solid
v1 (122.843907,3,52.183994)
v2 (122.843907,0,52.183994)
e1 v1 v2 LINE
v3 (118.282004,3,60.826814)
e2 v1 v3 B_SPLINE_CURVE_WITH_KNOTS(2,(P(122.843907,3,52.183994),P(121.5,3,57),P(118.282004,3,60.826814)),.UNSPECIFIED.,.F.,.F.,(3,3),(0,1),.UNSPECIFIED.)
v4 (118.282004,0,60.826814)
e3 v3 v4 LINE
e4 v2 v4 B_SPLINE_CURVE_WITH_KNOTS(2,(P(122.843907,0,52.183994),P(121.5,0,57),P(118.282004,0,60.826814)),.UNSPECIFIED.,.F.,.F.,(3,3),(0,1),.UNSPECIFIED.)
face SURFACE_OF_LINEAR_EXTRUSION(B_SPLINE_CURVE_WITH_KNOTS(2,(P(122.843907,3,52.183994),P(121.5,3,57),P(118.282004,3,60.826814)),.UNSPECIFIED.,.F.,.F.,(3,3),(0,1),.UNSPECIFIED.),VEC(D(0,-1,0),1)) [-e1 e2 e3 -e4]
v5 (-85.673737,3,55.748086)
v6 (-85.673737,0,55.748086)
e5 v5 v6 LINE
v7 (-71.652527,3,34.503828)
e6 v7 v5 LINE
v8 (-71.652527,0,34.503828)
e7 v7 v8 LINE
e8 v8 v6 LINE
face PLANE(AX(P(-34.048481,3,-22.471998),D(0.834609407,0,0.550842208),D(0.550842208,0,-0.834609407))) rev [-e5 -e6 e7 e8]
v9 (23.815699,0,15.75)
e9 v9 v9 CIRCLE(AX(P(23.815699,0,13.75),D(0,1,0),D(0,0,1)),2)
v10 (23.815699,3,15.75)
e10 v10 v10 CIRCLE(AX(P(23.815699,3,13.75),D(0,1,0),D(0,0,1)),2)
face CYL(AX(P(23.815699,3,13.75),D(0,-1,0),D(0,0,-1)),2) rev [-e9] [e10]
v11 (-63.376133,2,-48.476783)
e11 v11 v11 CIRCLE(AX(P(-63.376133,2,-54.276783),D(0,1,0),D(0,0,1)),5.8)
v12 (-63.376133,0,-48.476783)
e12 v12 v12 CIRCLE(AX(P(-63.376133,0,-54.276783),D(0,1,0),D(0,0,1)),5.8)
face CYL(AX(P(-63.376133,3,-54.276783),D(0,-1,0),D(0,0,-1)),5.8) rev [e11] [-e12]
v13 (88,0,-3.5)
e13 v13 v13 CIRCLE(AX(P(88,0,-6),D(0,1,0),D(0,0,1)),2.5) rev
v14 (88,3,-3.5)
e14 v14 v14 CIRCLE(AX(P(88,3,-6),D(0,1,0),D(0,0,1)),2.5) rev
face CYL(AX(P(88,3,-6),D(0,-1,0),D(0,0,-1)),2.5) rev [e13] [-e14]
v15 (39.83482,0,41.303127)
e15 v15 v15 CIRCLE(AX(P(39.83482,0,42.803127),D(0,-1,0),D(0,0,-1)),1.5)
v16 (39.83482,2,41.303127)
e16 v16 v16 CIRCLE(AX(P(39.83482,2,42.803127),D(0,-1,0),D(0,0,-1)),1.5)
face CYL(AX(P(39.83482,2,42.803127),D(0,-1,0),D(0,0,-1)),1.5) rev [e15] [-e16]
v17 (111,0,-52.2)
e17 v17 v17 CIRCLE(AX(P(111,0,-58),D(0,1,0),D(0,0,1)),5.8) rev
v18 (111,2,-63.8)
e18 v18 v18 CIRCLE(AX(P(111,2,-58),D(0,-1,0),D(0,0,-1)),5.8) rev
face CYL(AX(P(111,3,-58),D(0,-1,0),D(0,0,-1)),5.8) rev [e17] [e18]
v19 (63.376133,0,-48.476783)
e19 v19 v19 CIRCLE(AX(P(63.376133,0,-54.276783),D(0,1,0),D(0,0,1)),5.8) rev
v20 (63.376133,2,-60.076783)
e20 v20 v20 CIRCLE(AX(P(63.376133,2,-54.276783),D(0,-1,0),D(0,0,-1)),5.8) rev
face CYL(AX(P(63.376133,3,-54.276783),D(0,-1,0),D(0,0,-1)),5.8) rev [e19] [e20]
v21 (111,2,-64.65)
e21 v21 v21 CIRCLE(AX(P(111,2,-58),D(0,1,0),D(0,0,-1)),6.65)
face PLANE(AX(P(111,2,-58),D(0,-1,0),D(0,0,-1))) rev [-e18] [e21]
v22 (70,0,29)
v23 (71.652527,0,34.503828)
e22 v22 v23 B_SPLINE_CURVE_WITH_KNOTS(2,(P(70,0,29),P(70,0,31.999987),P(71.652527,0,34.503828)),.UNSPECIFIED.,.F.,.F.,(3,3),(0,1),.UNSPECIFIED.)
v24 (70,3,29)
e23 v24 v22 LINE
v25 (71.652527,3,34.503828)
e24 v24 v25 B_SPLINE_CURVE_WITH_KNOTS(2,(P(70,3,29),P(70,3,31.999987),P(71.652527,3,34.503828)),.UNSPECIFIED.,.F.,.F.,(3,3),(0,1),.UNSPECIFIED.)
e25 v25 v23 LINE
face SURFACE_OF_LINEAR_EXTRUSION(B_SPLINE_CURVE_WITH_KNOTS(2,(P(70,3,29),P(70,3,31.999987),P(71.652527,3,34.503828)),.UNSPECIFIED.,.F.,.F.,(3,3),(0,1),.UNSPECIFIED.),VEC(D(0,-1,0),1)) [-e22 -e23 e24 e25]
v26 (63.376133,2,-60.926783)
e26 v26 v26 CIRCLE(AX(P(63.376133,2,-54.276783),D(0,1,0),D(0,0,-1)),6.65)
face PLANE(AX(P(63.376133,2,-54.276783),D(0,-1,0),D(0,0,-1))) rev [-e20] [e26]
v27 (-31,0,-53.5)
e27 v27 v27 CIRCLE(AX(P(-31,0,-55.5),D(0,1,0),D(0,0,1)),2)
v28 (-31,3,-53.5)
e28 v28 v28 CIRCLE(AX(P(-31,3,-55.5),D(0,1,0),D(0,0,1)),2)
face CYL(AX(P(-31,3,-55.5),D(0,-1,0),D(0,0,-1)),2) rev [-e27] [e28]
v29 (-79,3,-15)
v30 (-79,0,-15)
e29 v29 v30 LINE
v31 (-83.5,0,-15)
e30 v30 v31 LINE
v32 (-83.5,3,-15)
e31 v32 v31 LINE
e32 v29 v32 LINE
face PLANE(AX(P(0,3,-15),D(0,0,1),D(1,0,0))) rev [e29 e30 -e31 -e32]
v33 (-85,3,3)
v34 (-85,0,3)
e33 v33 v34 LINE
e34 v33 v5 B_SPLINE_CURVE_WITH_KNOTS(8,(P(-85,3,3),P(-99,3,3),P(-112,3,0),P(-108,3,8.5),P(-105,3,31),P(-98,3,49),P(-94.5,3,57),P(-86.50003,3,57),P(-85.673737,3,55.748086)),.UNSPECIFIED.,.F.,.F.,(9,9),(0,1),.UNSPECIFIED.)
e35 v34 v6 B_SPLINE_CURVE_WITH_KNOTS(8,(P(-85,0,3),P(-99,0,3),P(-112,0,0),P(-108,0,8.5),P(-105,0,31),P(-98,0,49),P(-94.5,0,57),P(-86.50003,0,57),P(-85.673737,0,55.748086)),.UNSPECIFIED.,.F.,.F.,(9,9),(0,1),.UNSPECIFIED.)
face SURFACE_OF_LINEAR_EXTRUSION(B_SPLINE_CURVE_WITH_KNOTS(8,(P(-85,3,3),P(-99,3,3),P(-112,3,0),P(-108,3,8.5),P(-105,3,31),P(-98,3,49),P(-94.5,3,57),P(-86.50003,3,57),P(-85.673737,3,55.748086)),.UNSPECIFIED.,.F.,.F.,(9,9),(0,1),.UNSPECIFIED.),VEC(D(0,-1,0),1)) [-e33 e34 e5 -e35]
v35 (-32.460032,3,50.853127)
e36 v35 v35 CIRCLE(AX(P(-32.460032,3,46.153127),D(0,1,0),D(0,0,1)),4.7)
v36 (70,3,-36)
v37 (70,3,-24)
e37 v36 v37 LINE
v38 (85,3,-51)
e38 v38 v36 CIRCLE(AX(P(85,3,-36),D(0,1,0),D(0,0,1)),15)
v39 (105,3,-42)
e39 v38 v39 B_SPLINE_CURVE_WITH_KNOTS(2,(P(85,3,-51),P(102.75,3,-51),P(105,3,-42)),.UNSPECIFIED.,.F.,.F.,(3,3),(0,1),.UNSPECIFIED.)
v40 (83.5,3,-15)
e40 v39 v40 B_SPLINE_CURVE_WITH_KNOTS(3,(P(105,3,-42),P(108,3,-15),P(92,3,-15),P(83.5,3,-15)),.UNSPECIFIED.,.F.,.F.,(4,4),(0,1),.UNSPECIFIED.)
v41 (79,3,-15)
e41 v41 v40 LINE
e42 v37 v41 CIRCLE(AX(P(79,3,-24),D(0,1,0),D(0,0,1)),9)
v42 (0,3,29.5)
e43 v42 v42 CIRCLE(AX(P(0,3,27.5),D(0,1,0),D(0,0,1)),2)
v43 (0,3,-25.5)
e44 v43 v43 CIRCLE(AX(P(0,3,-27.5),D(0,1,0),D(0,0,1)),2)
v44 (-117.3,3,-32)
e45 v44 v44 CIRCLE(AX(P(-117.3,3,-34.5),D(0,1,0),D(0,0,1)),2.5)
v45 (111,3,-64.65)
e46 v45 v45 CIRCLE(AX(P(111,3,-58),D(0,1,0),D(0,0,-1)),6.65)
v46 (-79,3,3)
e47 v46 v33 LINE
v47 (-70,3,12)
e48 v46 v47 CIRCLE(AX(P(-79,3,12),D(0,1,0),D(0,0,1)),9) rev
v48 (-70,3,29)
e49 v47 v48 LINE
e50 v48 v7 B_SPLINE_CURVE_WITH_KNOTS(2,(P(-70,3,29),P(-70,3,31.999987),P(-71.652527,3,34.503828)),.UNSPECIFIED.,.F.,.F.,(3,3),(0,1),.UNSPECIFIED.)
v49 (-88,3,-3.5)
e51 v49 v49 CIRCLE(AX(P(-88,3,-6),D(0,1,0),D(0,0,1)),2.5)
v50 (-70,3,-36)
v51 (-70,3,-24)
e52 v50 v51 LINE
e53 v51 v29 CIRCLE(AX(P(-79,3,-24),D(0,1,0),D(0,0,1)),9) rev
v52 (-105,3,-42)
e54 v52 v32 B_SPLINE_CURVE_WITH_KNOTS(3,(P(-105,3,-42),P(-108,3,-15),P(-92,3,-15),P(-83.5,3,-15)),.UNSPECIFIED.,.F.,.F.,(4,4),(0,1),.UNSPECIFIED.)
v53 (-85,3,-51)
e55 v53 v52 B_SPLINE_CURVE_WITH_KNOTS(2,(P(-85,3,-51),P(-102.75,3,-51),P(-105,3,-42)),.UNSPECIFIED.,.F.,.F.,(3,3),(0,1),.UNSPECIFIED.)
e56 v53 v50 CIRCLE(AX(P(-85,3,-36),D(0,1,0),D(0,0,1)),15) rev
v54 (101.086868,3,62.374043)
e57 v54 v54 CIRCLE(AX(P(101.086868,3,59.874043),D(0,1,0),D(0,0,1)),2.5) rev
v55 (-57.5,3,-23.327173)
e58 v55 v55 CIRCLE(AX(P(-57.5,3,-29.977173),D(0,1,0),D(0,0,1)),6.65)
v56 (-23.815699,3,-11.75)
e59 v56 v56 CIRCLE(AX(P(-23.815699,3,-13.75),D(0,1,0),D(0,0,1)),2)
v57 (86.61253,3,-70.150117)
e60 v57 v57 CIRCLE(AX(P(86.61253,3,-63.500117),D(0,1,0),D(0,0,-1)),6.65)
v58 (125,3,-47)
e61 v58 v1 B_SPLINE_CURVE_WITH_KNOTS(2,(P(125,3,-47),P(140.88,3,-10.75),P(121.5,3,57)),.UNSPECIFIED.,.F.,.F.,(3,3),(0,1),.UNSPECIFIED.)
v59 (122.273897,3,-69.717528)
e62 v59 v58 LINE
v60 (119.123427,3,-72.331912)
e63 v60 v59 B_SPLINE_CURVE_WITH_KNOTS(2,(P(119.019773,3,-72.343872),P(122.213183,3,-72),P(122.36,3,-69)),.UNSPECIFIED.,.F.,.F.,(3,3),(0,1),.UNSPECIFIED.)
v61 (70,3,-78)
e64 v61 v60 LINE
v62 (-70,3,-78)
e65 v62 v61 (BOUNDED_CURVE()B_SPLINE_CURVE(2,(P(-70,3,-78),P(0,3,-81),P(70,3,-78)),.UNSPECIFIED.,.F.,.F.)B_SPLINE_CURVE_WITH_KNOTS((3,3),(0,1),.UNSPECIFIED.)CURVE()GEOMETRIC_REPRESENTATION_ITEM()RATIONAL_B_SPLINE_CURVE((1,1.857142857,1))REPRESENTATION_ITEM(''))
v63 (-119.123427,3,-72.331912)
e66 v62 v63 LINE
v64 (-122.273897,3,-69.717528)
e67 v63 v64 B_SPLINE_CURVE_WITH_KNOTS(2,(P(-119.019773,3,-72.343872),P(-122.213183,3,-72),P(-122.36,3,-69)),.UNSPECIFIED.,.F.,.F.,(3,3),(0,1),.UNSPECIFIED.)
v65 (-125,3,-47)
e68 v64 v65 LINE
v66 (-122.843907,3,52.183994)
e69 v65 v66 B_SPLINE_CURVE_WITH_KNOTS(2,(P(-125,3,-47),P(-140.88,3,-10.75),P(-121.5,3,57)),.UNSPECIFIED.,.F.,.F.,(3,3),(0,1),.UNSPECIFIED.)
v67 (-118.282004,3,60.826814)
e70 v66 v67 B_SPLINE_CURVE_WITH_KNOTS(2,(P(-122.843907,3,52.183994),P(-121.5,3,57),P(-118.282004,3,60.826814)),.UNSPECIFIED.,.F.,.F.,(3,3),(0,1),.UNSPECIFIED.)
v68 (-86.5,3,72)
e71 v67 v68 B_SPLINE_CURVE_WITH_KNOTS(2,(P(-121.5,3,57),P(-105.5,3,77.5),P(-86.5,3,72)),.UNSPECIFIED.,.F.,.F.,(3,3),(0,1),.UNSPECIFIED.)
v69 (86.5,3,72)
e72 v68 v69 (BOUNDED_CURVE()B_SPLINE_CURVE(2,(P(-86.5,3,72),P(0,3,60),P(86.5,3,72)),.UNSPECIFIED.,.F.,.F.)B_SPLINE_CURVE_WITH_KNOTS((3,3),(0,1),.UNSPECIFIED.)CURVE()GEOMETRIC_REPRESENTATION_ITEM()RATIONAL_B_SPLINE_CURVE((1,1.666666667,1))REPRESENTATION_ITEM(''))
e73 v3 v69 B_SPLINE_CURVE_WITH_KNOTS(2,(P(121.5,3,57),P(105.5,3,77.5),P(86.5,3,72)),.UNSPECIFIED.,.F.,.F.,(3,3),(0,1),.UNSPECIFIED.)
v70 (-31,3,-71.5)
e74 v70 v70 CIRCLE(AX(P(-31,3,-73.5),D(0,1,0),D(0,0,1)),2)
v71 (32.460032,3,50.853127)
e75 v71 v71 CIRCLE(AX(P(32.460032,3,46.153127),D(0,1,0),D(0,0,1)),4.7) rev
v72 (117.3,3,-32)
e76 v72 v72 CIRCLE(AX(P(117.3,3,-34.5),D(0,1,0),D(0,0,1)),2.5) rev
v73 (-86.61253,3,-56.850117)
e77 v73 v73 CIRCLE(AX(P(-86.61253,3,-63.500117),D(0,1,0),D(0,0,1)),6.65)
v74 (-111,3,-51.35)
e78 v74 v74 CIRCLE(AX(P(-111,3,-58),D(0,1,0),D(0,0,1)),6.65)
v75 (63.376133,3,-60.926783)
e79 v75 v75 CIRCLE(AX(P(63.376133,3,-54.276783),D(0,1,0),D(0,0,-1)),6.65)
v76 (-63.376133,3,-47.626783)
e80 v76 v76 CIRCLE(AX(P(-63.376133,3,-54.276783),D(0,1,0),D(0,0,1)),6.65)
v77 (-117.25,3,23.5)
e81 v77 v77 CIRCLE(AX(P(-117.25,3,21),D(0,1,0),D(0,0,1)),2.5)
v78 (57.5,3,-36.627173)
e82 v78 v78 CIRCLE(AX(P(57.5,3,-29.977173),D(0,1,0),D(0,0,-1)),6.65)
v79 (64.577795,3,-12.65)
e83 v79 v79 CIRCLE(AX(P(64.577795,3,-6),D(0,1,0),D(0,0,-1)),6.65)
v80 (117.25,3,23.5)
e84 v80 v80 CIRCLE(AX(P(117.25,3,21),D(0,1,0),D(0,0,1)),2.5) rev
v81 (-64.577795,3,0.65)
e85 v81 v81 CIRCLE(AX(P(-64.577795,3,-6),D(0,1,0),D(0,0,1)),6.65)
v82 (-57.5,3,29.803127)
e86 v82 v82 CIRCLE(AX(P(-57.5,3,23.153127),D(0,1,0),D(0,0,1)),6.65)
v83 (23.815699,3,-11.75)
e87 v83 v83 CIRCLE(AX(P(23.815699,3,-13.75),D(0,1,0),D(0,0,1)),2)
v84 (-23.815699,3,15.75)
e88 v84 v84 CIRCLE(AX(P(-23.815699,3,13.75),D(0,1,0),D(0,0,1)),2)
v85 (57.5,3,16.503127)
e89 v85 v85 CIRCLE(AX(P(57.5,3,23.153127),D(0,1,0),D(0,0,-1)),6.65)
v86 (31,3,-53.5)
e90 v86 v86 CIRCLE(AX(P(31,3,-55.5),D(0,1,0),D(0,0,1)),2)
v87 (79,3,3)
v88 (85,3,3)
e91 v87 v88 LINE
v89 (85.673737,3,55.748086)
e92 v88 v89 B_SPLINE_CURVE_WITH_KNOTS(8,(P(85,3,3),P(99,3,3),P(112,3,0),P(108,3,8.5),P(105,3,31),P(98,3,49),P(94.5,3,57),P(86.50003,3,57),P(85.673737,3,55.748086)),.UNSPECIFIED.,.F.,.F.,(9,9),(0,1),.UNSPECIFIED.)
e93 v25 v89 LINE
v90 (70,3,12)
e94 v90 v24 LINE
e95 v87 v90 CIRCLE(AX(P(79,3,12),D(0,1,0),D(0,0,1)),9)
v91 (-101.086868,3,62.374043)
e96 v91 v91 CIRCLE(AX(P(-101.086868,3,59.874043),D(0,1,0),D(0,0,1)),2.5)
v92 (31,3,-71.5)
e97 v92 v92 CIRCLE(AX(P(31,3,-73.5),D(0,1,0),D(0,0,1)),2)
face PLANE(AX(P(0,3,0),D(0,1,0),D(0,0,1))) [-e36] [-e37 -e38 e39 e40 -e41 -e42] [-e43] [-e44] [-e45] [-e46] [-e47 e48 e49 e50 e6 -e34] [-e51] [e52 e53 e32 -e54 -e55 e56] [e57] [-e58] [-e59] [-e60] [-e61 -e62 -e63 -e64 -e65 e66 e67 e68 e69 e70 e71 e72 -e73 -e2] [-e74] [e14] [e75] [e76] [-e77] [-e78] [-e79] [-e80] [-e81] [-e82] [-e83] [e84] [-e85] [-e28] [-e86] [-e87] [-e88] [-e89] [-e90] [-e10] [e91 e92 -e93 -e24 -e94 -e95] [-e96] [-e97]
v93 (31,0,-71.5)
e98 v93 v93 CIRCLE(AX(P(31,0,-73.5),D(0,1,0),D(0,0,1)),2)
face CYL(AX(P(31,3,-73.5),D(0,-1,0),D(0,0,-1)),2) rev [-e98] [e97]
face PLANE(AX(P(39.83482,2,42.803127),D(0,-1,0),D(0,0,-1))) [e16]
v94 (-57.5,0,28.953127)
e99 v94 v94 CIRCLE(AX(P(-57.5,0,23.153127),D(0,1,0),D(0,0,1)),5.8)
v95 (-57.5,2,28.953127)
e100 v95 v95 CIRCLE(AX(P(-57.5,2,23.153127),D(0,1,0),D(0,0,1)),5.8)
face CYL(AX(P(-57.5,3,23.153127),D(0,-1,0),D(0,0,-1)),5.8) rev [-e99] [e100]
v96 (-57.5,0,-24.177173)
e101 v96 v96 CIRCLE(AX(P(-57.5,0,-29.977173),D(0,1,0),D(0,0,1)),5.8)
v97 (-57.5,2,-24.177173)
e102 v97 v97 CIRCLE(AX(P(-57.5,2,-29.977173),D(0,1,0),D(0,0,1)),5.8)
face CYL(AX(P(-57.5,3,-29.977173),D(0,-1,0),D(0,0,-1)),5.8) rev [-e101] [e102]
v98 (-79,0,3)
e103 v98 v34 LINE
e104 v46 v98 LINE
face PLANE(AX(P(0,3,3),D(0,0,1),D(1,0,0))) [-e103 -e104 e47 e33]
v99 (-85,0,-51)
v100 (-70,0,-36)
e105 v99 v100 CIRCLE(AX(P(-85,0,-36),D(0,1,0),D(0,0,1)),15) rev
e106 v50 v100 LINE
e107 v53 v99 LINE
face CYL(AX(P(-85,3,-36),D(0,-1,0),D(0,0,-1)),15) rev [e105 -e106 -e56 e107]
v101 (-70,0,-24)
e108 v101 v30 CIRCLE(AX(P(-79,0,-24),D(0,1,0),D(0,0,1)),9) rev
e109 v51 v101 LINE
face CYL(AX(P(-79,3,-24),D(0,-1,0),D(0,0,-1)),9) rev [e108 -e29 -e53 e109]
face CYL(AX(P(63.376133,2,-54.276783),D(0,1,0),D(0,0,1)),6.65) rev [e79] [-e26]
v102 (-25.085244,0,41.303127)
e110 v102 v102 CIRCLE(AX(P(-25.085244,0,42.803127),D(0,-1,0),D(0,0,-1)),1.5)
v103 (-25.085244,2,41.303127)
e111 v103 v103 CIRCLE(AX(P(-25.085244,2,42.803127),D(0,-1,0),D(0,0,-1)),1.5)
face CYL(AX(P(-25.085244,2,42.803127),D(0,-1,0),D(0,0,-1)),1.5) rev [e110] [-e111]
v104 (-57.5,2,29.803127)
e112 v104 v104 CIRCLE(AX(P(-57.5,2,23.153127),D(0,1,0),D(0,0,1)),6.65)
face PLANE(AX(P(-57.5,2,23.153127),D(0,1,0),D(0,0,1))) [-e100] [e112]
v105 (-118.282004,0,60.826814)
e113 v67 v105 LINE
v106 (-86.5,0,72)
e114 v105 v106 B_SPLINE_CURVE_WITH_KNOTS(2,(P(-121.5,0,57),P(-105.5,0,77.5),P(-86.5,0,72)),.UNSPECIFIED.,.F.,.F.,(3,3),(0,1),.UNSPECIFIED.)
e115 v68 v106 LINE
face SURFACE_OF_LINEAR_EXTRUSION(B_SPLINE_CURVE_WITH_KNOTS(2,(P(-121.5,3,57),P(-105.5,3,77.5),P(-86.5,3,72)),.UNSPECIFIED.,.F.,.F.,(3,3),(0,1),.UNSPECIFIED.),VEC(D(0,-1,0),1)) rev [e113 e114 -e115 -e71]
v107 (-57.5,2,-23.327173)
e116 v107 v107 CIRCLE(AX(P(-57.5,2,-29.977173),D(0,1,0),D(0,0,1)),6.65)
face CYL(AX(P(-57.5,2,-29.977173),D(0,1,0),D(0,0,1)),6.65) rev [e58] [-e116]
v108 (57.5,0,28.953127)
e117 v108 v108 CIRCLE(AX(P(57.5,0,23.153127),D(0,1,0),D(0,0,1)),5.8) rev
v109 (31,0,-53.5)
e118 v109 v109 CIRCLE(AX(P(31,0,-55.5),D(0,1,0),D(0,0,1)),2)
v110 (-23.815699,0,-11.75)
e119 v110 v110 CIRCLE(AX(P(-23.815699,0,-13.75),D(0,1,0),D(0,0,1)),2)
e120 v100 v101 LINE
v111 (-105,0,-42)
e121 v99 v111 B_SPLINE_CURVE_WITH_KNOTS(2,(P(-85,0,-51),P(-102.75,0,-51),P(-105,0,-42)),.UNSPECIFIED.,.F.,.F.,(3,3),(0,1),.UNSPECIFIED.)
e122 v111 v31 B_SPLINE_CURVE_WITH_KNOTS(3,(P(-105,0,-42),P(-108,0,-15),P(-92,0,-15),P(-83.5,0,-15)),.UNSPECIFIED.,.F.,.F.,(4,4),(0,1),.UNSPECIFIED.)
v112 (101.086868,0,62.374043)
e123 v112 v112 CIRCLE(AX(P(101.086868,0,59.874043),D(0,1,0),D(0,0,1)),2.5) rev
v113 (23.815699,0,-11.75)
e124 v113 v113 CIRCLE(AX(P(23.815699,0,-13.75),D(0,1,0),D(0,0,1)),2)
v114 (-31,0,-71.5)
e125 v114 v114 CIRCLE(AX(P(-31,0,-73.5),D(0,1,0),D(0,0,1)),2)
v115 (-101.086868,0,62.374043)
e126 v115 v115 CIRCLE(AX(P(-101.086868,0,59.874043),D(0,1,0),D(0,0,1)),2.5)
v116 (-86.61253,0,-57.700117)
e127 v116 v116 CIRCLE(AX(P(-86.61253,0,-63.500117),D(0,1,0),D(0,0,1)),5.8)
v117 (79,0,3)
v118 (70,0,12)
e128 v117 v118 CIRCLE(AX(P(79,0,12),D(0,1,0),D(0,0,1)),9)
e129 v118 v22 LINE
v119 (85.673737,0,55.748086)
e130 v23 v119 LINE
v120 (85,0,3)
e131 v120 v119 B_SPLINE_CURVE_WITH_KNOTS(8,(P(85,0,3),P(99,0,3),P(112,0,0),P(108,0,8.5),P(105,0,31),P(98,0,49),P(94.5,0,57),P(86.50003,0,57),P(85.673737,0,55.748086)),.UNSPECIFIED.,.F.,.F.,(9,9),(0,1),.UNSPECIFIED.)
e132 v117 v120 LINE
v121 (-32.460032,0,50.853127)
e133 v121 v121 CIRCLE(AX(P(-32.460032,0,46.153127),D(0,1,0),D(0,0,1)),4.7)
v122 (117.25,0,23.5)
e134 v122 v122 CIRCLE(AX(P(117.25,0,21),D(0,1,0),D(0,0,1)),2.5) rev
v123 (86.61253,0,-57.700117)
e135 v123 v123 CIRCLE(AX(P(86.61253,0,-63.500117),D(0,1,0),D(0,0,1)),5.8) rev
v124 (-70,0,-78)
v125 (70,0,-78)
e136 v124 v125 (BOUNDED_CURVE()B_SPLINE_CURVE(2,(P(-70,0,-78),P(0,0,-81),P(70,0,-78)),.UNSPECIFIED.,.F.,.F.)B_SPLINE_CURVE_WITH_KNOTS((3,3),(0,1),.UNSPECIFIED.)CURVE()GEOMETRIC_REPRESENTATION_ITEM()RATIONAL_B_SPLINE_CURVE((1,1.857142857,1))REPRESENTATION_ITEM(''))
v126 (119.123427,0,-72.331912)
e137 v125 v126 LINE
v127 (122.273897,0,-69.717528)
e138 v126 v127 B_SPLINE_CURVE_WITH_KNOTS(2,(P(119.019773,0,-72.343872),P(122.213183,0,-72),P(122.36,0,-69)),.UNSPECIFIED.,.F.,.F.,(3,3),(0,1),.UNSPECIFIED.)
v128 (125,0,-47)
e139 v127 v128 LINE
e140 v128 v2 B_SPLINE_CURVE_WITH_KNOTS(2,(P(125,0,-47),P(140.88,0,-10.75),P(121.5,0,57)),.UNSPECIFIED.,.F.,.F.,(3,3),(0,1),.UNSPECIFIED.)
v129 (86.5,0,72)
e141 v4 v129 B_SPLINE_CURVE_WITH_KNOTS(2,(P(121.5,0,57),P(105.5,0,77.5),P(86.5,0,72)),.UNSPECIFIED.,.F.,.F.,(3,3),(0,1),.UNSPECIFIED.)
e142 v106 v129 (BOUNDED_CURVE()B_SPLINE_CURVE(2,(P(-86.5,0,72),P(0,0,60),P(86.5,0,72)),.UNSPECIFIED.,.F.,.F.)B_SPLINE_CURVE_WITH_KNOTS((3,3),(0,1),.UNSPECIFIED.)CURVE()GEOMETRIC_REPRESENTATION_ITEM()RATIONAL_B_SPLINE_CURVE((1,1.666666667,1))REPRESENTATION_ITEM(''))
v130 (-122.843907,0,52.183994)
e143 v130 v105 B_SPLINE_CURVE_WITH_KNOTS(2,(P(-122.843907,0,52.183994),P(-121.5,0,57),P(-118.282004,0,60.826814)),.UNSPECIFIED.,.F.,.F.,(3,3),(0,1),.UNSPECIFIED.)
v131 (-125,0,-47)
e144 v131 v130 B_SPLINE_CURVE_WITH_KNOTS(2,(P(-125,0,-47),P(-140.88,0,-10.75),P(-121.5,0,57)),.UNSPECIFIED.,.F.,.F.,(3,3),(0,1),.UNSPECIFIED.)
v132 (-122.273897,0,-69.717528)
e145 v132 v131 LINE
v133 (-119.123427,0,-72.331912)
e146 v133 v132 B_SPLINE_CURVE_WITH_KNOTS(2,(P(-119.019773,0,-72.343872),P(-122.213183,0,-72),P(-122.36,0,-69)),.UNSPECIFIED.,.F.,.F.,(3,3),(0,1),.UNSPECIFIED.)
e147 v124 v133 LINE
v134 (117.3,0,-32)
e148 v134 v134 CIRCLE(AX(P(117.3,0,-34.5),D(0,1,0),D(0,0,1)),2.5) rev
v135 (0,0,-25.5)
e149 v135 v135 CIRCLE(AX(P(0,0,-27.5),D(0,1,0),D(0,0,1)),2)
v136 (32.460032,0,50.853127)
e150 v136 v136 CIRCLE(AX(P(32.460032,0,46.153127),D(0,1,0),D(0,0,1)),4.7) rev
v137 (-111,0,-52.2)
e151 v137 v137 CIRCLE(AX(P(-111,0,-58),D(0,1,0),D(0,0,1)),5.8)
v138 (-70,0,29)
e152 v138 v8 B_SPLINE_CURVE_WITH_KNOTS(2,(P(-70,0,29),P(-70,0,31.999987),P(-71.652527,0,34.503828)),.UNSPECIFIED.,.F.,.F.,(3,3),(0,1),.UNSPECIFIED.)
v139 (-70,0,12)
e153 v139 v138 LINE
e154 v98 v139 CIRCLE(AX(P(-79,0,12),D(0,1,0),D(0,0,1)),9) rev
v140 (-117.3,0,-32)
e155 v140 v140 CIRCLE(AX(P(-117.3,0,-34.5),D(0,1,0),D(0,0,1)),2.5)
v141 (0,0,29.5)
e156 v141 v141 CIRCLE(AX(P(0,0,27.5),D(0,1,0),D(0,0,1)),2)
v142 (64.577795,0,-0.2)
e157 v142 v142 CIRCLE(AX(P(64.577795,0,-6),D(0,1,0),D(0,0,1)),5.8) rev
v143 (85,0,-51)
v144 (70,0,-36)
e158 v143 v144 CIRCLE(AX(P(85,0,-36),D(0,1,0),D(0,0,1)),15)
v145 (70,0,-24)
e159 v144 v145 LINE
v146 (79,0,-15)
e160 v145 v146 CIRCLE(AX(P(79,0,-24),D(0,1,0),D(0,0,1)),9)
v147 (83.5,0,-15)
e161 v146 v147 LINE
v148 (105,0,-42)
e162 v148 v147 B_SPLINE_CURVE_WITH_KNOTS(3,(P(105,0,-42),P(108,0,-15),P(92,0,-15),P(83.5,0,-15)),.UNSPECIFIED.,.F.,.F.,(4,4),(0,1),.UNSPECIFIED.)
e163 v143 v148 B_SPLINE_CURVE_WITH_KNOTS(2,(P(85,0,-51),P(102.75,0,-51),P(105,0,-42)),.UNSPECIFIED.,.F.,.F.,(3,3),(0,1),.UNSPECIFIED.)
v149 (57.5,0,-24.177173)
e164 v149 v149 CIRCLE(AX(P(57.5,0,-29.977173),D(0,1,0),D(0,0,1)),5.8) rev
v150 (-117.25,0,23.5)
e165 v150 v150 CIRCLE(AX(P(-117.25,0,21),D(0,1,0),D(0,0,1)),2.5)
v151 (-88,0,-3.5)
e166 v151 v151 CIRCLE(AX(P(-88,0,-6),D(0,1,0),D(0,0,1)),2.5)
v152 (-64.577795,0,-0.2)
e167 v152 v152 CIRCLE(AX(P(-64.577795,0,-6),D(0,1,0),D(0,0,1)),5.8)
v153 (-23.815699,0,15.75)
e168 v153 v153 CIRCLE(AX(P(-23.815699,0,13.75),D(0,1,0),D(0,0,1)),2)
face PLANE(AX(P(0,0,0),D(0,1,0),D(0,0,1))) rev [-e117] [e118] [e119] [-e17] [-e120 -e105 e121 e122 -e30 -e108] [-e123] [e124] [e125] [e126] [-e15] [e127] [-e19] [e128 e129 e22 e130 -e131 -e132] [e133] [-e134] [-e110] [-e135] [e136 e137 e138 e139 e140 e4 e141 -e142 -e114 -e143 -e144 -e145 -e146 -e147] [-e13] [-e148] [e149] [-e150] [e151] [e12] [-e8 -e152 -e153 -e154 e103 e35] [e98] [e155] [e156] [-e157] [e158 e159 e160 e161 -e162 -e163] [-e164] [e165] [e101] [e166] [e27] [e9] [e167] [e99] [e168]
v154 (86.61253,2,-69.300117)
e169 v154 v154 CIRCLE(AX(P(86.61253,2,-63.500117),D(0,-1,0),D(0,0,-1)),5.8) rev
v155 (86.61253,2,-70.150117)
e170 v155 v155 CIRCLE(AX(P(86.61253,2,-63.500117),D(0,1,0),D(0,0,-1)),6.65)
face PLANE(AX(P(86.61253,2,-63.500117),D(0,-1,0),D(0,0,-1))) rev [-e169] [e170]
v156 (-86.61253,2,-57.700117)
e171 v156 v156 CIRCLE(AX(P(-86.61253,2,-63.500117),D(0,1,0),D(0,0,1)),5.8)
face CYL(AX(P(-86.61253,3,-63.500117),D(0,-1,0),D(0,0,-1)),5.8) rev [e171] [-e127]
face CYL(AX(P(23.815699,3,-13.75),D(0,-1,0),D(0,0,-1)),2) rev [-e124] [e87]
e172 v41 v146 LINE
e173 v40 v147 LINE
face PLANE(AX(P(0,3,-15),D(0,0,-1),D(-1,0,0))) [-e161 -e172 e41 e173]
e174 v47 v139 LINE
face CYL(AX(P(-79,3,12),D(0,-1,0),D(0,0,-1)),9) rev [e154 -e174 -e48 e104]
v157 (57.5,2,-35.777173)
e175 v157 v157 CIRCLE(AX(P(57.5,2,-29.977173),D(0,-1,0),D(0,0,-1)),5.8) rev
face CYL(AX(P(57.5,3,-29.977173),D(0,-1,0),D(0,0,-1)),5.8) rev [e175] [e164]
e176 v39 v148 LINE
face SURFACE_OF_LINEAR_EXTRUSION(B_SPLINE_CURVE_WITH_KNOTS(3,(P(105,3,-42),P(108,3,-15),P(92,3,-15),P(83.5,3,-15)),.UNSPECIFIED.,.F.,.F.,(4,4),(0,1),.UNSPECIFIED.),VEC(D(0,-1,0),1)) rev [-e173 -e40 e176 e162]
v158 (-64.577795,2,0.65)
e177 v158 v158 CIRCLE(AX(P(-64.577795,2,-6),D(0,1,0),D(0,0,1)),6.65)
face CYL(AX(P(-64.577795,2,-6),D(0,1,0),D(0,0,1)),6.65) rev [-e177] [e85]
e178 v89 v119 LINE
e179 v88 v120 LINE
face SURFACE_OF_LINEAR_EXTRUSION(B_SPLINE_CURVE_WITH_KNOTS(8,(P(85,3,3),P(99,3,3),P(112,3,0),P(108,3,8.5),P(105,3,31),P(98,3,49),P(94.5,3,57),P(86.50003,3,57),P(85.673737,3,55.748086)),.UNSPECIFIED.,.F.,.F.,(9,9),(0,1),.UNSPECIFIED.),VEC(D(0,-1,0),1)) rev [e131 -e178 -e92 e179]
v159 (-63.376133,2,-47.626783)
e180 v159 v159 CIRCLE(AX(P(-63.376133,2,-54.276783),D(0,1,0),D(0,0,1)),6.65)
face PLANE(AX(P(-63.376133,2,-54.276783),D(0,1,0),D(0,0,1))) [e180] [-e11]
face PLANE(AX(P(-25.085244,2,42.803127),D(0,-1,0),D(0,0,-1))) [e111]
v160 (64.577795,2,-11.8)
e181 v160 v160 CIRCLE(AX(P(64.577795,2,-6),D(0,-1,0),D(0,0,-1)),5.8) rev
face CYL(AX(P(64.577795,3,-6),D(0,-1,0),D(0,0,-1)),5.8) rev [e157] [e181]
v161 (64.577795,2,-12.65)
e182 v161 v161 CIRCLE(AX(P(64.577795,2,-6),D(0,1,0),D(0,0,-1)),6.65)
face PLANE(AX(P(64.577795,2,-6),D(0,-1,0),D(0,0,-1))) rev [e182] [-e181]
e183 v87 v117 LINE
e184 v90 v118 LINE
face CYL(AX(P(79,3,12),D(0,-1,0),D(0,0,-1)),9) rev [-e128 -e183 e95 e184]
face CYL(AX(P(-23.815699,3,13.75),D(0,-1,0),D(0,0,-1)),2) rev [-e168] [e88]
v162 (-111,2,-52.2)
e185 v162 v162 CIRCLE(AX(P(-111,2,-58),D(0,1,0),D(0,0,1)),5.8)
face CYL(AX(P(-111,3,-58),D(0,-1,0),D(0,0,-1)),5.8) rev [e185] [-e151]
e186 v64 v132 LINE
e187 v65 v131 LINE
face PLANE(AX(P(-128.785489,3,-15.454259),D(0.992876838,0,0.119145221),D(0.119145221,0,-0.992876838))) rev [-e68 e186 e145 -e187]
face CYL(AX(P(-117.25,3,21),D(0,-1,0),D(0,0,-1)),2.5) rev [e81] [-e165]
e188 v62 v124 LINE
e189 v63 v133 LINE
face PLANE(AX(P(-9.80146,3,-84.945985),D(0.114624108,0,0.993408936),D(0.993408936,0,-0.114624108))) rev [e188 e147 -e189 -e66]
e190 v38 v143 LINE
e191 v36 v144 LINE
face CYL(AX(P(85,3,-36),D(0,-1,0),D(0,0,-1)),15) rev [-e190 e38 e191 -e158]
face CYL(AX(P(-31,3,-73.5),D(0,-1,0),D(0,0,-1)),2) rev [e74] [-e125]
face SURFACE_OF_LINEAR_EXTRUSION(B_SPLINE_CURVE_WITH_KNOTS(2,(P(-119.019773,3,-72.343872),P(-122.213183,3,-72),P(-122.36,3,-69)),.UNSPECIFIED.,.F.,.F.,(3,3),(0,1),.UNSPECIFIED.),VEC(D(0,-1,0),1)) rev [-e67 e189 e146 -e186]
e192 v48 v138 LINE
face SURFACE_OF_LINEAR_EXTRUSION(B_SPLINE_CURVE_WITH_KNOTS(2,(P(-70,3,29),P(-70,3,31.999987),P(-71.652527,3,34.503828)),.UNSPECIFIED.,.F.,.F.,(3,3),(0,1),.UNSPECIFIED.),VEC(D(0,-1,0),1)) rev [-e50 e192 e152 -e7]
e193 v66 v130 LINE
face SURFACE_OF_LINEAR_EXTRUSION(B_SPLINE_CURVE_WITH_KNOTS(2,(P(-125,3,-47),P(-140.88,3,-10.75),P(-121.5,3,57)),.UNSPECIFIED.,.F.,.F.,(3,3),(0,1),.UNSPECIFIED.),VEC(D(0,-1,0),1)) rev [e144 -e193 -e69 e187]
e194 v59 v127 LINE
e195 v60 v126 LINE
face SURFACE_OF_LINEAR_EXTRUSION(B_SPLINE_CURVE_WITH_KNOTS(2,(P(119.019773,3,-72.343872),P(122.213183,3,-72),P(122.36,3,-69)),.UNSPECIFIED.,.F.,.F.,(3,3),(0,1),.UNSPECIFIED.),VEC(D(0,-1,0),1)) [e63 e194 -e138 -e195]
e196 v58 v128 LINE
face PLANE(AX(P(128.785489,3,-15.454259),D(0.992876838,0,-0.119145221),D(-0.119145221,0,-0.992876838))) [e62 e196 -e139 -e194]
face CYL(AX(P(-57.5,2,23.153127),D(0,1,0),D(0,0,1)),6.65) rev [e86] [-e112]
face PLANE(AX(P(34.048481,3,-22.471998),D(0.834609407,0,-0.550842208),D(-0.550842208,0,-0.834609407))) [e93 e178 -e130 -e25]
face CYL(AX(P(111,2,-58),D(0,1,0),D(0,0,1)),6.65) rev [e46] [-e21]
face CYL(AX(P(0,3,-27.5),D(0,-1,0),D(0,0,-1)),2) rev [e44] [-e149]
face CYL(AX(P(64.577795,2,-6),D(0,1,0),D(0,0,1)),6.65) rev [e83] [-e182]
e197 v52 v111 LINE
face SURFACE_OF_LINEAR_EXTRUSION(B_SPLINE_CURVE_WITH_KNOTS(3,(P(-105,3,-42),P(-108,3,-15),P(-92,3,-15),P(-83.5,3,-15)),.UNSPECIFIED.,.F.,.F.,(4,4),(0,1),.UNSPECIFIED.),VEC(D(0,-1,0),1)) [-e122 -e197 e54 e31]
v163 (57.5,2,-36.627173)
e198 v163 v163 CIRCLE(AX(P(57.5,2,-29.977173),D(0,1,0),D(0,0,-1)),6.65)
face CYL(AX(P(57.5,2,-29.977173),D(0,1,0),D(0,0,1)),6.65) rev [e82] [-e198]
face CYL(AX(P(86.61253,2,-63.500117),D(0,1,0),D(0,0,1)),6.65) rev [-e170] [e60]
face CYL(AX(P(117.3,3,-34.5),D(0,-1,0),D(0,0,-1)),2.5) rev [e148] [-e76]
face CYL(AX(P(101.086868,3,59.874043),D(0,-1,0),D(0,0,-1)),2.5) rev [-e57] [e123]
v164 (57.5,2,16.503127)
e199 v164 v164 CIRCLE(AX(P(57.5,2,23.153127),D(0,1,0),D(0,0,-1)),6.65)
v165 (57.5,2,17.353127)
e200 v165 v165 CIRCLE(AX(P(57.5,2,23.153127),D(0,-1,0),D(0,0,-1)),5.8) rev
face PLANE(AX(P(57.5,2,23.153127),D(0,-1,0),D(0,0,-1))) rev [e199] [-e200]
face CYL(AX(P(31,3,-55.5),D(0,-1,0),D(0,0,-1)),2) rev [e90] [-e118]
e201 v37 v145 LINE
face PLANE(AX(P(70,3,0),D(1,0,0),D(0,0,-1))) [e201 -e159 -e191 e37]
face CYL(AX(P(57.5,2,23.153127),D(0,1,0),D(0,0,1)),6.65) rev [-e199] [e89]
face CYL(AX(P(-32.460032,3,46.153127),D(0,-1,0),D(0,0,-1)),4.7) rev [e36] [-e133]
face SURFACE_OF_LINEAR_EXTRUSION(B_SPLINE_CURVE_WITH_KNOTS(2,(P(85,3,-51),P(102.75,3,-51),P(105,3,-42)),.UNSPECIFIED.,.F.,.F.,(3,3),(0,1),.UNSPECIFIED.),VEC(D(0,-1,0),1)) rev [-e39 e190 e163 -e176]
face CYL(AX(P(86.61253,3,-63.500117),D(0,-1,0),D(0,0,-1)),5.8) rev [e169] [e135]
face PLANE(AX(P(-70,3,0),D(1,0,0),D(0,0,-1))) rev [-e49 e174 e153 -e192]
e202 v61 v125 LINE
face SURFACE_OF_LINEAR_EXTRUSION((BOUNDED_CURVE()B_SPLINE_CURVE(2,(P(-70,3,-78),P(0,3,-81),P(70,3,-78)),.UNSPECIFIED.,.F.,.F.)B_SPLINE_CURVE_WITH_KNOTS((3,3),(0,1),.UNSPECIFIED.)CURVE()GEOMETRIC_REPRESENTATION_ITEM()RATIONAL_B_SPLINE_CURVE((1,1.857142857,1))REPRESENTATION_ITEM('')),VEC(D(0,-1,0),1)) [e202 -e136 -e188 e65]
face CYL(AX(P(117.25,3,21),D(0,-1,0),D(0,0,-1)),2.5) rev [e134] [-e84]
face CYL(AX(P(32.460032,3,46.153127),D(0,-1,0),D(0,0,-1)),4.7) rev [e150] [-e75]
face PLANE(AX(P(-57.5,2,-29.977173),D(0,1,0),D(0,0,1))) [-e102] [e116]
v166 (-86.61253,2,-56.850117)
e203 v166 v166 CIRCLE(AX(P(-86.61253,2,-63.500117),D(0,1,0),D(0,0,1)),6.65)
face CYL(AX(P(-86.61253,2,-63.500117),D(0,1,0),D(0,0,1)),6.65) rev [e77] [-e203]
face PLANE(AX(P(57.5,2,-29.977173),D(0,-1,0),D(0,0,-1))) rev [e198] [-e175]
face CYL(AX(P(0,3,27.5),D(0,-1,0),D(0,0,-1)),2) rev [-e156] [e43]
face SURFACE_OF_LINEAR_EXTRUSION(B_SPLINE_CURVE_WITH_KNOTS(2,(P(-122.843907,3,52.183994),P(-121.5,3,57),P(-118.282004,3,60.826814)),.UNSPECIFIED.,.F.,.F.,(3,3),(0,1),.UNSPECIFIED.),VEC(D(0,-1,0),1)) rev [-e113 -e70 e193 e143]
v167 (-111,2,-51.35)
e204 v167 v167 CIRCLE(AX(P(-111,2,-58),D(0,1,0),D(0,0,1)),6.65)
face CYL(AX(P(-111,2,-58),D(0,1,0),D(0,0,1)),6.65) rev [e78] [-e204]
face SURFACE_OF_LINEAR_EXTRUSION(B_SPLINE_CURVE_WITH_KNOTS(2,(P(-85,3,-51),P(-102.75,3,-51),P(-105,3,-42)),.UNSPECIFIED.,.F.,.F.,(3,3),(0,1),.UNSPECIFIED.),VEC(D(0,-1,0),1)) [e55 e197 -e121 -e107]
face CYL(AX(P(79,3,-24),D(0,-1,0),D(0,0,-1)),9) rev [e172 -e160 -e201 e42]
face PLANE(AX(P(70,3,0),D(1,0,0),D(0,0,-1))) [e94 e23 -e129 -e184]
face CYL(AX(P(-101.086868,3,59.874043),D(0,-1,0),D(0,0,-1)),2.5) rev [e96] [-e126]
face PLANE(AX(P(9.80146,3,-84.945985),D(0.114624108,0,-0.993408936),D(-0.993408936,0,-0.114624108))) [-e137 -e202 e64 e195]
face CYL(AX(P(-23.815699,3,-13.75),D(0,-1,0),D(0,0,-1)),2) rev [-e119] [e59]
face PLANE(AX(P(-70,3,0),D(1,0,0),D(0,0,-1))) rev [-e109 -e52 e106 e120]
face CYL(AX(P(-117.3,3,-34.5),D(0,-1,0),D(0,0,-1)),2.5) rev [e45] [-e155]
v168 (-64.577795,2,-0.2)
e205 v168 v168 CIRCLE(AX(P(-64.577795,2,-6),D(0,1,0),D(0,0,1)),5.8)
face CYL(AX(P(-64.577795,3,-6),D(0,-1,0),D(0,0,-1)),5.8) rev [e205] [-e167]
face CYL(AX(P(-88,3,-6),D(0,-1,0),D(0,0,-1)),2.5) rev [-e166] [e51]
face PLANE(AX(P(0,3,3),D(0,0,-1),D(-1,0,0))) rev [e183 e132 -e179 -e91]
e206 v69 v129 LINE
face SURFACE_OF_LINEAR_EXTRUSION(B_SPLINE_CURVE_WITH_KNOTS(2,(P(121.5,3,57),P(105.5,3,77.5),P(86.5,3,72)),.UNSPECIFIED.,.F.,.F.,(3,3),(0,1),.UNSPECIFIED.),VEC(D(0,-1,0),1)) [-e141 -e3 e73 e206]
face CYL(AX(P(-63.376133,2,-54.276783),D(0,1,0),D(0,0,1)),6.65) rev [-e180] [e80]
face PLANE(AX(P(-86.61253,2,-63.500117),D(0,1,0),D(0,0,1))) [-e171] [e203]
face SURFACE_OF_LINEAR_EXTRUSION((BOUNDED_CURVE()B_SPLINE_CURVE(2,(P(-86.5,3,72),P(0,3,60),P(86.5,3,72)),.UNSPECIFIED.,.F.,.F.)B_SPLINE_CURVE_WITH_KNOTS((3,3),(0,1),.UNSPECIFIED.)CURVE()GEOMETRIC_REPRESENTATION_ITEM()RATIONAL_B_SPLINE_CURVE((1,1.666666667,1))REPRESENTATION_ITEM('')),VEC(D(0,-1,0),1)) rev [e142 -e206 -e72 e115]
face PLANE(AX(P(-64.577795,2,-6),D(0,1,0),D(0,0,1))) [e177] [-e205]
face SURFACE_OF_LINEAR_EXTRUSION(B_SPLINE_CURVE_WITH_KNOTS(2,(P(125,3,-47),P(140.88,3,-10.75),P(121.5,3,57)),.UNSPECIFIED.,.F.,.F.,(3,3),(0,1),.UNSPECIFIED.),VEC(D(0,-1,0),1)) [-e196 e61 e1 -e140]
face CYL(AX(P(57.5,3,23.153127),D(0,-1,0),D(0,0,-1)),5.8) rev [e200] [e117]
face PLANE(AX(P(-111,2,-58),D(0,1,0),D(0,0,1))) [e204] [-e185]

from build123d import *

# Parameters (mm, degrees)
BOSS_EXTRUDE1_OUTLINE_R   = 2.5
BOSS_EXTRUDE1_OUTLINE_R_2 = 4.7
BOSS_EXTRUDE1_OUTLINE_R_3 = 5.8
BOSS_EXTRUDE1_OUTLINE_R_4 = 2
BOSS_EXTRUDE1_DEPTH       = 3
SKETCH3_R                 = 1.5
CUT_EXTRUDE1_DEPTH        = 2
SKETCH4_R                 = 6.65
CUT_EXTRUDE3_DEPTH        = 1


# Read off the part's stored shape, not the designer's step: Boss-Extrude1
with BuildPart() as part:
    # Boss-Extrude1 outline → Boss-Extrude1 (new body)
    with BuildSketch(Plane(origin=(0, 0, 0), x_dir=(1, 0, 0), z_dir=(0, 1, 0))):
        with BuildLine():
            Line((-70, 78), (-119.123426788, 72.331912294))
            add(Edge.make_bspline(
                [(-119.123426788, 72.331912294), (-121.817313074, 72.000000019), (-122.273896674, 69.717527721)],
                knots=[0.016356922, 0.016356922, 0.016356922, 0.873306336, 0.873306336, 0.873306336], degree=2))
            Line((-122.273896674, 69.717527721), (-125, 47))
            add(Edge.make_bspline(
                [(-125, 47), (-140.310843166, 12.049240253), (-122.843906966, -52.183993971)],
                knots=[0, 0, 0, 0.96415889, 0.96415889, 0.96415889], degree=2))
            add(Edge.make_bspline(
                [(-122.843906966, -52.183993971), (-121.5, -57), (-118.282004102, -60.826813609)],
                knots=[0, 0, 0, 1, 1, 1], degree=2))
            add(Edge.make_bspline(
                [(-118.282004102, -60.826813609), (-103.606996493, -76.952025301), (-86.5, -72)],
                knots=[0.099631764, 0.099631764, 0.099631764, 1, 1, 1], degree=2))
            add(Edge.make_bspline(
                [(-86.5, -72), (0, -60), (86.5, -72)],
                knots=[0, 0, 0, 1, 1, 1], degree=2, weights=[1, 1.666666667, 1]))
            add(Edge.make_bspline(
                [(118.282004106, -60.826813605), (103.606996495, -76.952025301), (86.5, -72)],
                knots=[0.099631763, 0.099631763, 0.099631763, 1, 1, 1], degree=2))
            add(Edge.make_bspline(
                [(122.843906966, -52.183993971), (121.5, -57), (118.282004106, -60.826813605)],
                knots=[0, 0, 0, 1, 1, 1], degree=2))
            add(Edge.make_bspline(
                [(125, 47), (140.310843171, 12.049240242), (122.843906966, -52.183993971)],
                knots=[0, 0, 0, 0.96415889, 0.96415889, 0.96415889], degree=2))
            Line((125, 47), (122.273896674, 69.717527721))
            add(Edge.make_bspline(
                [(119.123426788, 72.331912294), (121.817313074, 72.000000019), (122.273896674, 69.717527721)],
                knots=[0.016356922, 0.016356922, 0.016356922, 0.873306336, 0.873306336, 0.873306336], degree=2))
            Line((119.123426788, 72.331912294), (70, 78))
            add(Edge.make_bspline(
                [(-70, 78), (0, 81), (70, 78)],
                knots=[0, 0, 0, 1, 1, 1], degree=2, weights=[1, 1.857142857, 1]))
        make_face()
        with Locations((-101.086868344, -59.874042945)):
            Circle(BOSS_EXTRUDE1_OUTLINE_R, mode=Mode.SUBTRACT)
        with Locations((-32.460031949, -46.153127094)):
            Circle(BOSS_EXTRUDE1_OUTLINE_R_2, mode=Mode.SUBTRACT)
        with Locations((-117.25, -21)):
            Circle(BOSS_EXTRUDE1_OUTLINE_R, mode=Mode.SUBTRACT)
        with BuildLine():
            Line((-70, -12), (-70, -29))
            add(Edge.make_bspline(
                [(-70, -29), (-70, -31.999987298), (-71.652526625, -34.50382822)],
                knots=[0, 0, 0, 1, 1, 1], degree=2))
            Line((-71.652526625, -34.50382822), (-85.673736688, -55.74808589))
            add(Edge.make_bspline(
                [(-85, -3), (-99, -3), (-112, 0), (-108, -8.5), (-105, -31), (-98, -49), (-94.5, -57), (-86.500030089, -57), (-85.673736688, -55.74808589)],
                knots=[0, 0, 0, 0, 0, 0, 0, 0, 0, 1, 1, 1, 1, 1, 1, 1, 1, 1], degree=8))
            Line((-85, -3), (-79, -3))
            ThreePointArc((-79, -3), (-72.636038969, -5.636038969), (-70, -12))
        make_face(mode=Mode.SUBTRACT)
        with Locations((-57.5, -23.153127094)):
            Circle(BOSS_EXTRUDE1_OUTLINE_R_3, mode=Mode.SUBTRACT)
        with Locations((0, -27.5)):
            Circle(BOSS_EXTRUDE1_OUTLINE_R_4, mode=Mode.SUBTRACT)
        with Locations((-23.815698604, -13.75)):
            Circle(BOSS_EXTRUDE1_OUTLINE_R_4, mode=Mode.SUBTRACT)
        with Locations((32.460031949, -46.153127094)):
            Circle(BOSS_EXTRUDE1_OUTLINE_R_2, mode=Mode.SUBTRACT)
        with Locations((101.086868344, -59.874042945)):
            Circle(BOSS_EXTRUDE1_OUTLINE_R, mode=Mode.SUBTRACT)
        with Locations((57.5, -23.153127094)):
            Circle(BOSS_EXTRUDE1_OUTLINE_R_3, mode=Mode.SUBTRACT)
        with Locations((23.815698604, -13.75)):
            Circle(BOSS_EXTRUDE1_OUTLINE_R_4, mode=Mode.SUBTRACT)
        with BuildLine():
            add(Edge.make_bspline(
                [(85, -3), (99, -3), (112, 0), (108, -8.5), (105, -31), (98, -49), (94.5, -57), (86.500030089, -57), (85.673736688, -55.74808589)],
                knots=[0, 0, 0, 0, 0, 0, 0, 0, 0, 1, 1, 1, 1, 1, 1, 1, 1, 1], degree=8))
            Line((85.673736688, -55.74808589), (71.652526625, -34.50382822))
            add(Edge.make_bspline(
                [(70, -29), (70, -31.999987298), (71.652526625, -34.50382822)],
                knots=[0, 0, 0, 1, 1, 1], degree=2))
            Line((70, -29), (70, -12))
            ThreePointArc((70, -12), (72.636038969, -5.636038969), (79, -3))
            Line((79, -3), (85, -3))
        make_face(mode=Mode.SUBTRACT)
        with Locations((117.25, -21)):
            Circle(BOSS_EXTRUDE1_OUTLINE_R, mode=Mode.SUBTRACT)
        with Locations((-88, 6)):
            Circle(BOSS_EXTRUDE1_OUTLINE_R, mode=Mode.SUBTRACT)
        with Locations((-117.3, 34.5)):
            Circle(BOSS_EXTRUDE1_OUTLINE_R, mode=Mode.SUBTRACT)
        with BuildLine():
            add(Edge.make_bspline(
                [(-105, 42), (-108, 15), (-92, 15), (-83.5, 15)],
                knots=[0, 0, 0, 0, 1, 1, 1, 1], degree=3))
            add(Edge.make_bspline(
                [(-85, 51), (-102.75, 51), (-105, 42)],
                knots=[0, 0, 0, 1, 1, 1], degree=2))
            ThreePointArc((-85, 51), (-74.393398282, 46.606601718), (-70, 36))
            Line((-70, 36), (-70, 24))
            ThreePointArc((-70, 24), (-72.636038969, 17.636038969), (-79, 15))
            Line((-79, 15), (-83.5, 15))
        make_face(mode=Mode.SUBTRACT)
        with Locations((-64.577794898, 6)):
            Circle(BOSS_EXTRUDE1_OUTLINE_R_3, mode=Mode.SUBTRACT)
        with Locations((-23.815698604, 13.75)):
            Circle(BOSS_EXTRUDE1_OUTLINE_R_4, mode=Mode.SUBTRACT)
        with Locations((-57.5, 29.977172881)):
            Circle(BOSS_EXTRUDE1_OUTLINE_R_3, mode=Mode.SUBTRACT)
        with Locations((0, 27.5)):
            Circle(BOSS_EXTRUDE1_OUTLINE_R_4, mode=Mode.SUBTRACT)
        with Locations((-111, 58)):
            Circle(BOSS_EXTRUDE1_OUTLINE_R_3, mode=Mode.SUBTRACT)
        with Locations((-86.612529585, 63.500116978)):
            Circle(BOSS_EXTRUDE1_OUTLINE_R_3, mode=Mode.SUBTRACT)
        with Locations((-63.376133298, 54.276783114)):
            Circle(BOSS_EXTRUDE1_OUTLINE_R_3, mode=Mode.SUBTRACT)
        with Locations((-31, 55.5)):
            Circle(BOSS_EXTRUDE1_OUTLINE_R_4, mode=Mode.SUBTRACT)
        with Locations((-31, 73.5)):
            Circle(BOSS_EXTRUDE1_OUTLINE_R_4, mode=Mode.SUBTRACT)
        with Locations((23.815698604, 13.75)):
            Circle(BOSS_EXTRUDE1_OUTLINE_R_4, mode=Mode.SUBTRACT)
        with Locations((64.577794898, 6)):
            Circle(BOSS_EXTRUDE1_OUTLINE_R_3, mode=Mode.SUBTRACT)
        with Locations((57.5, 29.977172881)):
            Circle(BOSS_EXTRUDE1_OUTLINE_R_3, mode=Mode.SUBTRACT)
        with Locations((88, 6)):
            Circle(BOSS_EXTRUDE1_OUTLINE_R, mode=Mode.SUBTRACT)
        with BuildLine():
            ThreePointArc((70, 36), (74.393398282, 46.606601718), (85, 51))
            add(Edge.make_bspline(
                [(85, 51), (102.75, 51), (105, 42)],
                knots=[0, 0, 0, 1, 1, 1], degree=2))
            add(Edge.make_bspline(
                [(105, 42), (108, 15), (92, 15), (83.5, 15)],
                knots=[0, 0, 0, 0, 1, 1, 1, 1], degree=3))
            Line((83.5, 15), (79, 15))
            ThreePointArc((79, 15), (72.636038969, 17.636038969), (70, 24))
            Line((70, 24), (70, 36))
        make_face(mode=Mode.SUBTRACT)
        with Locations((117.3, 34.5)):
            Circle(BOSS_EXTRUDE1_OUTLINE_R, mode=Mode.SUBTRACT)
        with Locations((31, 55.5)):
            Circle(BOSS_EXTRUDE1_OUTLINE_R_4, mode=Mode.SUBTRACT)
        with Locations((63.376133298, 54.276783114)):
            Circle(BOSS_EXTRUDE1_OUTLINE_R_3, mode=Mode.SUBTRACT)
        with Locations((31, 73.5)):
            Circle(BOSS_EXTRUDE1_OUTLINE_R_4, mode=Mode.SUBTRACT)
        with Locations((111, 58)):
            Circle(BOSS_EXTRUDE1_OUTLINE_R_3, mode=Mode.SUBTRACT)
        with Locations((86.612529585, 63.500116978)):
            Circle(BOSS_EXTRUDE1_OUTLINE_R_3, mode=Mode.SUBTRACT)
    extrude(amount=BOSS_EXTRUDE1_DEPTH)

    # Sketch3 → Cut-Extrude1 (cut)
    with BuildSketch(Plane.XZ):
        with Locations(Location((-25.085243816, 42.803127094, 0), (0, 0, 270))):
            Circle(SKETCH3_R)
        with Locations(Location((39.834820081, 42.803127094, 0), (0, 0, 270))):
            Circle(SKETCH3_R)
    extrude(amount=-CUT_EXTRUDE1_DEPTH, mode=Mode.SUBTRACT)

    # Sketch4 → Cut-Extrude3 (cut)
    with BuildSketch(Plane(origin=(0, 3, 0), x_dir=(1, 0, 0), z_dir=(0, 1, 0))):
        with Locations(Location((-57.5, 29.977172881, 0), (0, 0, 270))):
            Circle(SKETCH4_R)
        with Locations(Location((-63.376133298, 54.276783114, 0), (0, 0, 270))):
            Circle(SKETCH4_R)
        with Locations(Location((-86.612529585, 63.500116978, 0), (0, 0, 270))):
            Circle(SKETCH4_R)
        with Locations(Location((-111, 58, 0), (0, 0, 270))):
            Circle(SKETCH4_R)
        with Locations(Location((-64.577794898, 6, 0), (0, 0, 270))):
            Circle(SKETCH4_R)
        with Locations(Location((-57.5, -23.153127094, 0), (0, 0, 270))):
            Circle(SKETCH4_R)
        with Locations(Location((57.5, -23.153127094, 0), (0, 0, 90))):
            Circle(SKETCH4_R)
        with Locations(Location((64.577794898, 6, 0), (0, 0, 90))):
            Circle(SKETCH4_R)
        with Locations(Location((111, 58, 0), (0, 0, 90))):
            Circle(SKETCH4_R)
        with Locations(Location((86.612529585, 63.500116978, 0), (0, 0, 90))):
            Circle(SKETCH4_R)
        with Locations(Location((63.376133298, 54.276783114, 0), (0, 0, 90))):
            Circle(SKETCH4_R)
        with Locations(Location((57.5, 29.977172881, 0), (0, 0, 90))):
            Circle(SKETCH4_R)
    extrude(amount=-CUT_EXTRUDE3_DEPTH, mode=Mode.SUBTRACT)


solid = part.part
